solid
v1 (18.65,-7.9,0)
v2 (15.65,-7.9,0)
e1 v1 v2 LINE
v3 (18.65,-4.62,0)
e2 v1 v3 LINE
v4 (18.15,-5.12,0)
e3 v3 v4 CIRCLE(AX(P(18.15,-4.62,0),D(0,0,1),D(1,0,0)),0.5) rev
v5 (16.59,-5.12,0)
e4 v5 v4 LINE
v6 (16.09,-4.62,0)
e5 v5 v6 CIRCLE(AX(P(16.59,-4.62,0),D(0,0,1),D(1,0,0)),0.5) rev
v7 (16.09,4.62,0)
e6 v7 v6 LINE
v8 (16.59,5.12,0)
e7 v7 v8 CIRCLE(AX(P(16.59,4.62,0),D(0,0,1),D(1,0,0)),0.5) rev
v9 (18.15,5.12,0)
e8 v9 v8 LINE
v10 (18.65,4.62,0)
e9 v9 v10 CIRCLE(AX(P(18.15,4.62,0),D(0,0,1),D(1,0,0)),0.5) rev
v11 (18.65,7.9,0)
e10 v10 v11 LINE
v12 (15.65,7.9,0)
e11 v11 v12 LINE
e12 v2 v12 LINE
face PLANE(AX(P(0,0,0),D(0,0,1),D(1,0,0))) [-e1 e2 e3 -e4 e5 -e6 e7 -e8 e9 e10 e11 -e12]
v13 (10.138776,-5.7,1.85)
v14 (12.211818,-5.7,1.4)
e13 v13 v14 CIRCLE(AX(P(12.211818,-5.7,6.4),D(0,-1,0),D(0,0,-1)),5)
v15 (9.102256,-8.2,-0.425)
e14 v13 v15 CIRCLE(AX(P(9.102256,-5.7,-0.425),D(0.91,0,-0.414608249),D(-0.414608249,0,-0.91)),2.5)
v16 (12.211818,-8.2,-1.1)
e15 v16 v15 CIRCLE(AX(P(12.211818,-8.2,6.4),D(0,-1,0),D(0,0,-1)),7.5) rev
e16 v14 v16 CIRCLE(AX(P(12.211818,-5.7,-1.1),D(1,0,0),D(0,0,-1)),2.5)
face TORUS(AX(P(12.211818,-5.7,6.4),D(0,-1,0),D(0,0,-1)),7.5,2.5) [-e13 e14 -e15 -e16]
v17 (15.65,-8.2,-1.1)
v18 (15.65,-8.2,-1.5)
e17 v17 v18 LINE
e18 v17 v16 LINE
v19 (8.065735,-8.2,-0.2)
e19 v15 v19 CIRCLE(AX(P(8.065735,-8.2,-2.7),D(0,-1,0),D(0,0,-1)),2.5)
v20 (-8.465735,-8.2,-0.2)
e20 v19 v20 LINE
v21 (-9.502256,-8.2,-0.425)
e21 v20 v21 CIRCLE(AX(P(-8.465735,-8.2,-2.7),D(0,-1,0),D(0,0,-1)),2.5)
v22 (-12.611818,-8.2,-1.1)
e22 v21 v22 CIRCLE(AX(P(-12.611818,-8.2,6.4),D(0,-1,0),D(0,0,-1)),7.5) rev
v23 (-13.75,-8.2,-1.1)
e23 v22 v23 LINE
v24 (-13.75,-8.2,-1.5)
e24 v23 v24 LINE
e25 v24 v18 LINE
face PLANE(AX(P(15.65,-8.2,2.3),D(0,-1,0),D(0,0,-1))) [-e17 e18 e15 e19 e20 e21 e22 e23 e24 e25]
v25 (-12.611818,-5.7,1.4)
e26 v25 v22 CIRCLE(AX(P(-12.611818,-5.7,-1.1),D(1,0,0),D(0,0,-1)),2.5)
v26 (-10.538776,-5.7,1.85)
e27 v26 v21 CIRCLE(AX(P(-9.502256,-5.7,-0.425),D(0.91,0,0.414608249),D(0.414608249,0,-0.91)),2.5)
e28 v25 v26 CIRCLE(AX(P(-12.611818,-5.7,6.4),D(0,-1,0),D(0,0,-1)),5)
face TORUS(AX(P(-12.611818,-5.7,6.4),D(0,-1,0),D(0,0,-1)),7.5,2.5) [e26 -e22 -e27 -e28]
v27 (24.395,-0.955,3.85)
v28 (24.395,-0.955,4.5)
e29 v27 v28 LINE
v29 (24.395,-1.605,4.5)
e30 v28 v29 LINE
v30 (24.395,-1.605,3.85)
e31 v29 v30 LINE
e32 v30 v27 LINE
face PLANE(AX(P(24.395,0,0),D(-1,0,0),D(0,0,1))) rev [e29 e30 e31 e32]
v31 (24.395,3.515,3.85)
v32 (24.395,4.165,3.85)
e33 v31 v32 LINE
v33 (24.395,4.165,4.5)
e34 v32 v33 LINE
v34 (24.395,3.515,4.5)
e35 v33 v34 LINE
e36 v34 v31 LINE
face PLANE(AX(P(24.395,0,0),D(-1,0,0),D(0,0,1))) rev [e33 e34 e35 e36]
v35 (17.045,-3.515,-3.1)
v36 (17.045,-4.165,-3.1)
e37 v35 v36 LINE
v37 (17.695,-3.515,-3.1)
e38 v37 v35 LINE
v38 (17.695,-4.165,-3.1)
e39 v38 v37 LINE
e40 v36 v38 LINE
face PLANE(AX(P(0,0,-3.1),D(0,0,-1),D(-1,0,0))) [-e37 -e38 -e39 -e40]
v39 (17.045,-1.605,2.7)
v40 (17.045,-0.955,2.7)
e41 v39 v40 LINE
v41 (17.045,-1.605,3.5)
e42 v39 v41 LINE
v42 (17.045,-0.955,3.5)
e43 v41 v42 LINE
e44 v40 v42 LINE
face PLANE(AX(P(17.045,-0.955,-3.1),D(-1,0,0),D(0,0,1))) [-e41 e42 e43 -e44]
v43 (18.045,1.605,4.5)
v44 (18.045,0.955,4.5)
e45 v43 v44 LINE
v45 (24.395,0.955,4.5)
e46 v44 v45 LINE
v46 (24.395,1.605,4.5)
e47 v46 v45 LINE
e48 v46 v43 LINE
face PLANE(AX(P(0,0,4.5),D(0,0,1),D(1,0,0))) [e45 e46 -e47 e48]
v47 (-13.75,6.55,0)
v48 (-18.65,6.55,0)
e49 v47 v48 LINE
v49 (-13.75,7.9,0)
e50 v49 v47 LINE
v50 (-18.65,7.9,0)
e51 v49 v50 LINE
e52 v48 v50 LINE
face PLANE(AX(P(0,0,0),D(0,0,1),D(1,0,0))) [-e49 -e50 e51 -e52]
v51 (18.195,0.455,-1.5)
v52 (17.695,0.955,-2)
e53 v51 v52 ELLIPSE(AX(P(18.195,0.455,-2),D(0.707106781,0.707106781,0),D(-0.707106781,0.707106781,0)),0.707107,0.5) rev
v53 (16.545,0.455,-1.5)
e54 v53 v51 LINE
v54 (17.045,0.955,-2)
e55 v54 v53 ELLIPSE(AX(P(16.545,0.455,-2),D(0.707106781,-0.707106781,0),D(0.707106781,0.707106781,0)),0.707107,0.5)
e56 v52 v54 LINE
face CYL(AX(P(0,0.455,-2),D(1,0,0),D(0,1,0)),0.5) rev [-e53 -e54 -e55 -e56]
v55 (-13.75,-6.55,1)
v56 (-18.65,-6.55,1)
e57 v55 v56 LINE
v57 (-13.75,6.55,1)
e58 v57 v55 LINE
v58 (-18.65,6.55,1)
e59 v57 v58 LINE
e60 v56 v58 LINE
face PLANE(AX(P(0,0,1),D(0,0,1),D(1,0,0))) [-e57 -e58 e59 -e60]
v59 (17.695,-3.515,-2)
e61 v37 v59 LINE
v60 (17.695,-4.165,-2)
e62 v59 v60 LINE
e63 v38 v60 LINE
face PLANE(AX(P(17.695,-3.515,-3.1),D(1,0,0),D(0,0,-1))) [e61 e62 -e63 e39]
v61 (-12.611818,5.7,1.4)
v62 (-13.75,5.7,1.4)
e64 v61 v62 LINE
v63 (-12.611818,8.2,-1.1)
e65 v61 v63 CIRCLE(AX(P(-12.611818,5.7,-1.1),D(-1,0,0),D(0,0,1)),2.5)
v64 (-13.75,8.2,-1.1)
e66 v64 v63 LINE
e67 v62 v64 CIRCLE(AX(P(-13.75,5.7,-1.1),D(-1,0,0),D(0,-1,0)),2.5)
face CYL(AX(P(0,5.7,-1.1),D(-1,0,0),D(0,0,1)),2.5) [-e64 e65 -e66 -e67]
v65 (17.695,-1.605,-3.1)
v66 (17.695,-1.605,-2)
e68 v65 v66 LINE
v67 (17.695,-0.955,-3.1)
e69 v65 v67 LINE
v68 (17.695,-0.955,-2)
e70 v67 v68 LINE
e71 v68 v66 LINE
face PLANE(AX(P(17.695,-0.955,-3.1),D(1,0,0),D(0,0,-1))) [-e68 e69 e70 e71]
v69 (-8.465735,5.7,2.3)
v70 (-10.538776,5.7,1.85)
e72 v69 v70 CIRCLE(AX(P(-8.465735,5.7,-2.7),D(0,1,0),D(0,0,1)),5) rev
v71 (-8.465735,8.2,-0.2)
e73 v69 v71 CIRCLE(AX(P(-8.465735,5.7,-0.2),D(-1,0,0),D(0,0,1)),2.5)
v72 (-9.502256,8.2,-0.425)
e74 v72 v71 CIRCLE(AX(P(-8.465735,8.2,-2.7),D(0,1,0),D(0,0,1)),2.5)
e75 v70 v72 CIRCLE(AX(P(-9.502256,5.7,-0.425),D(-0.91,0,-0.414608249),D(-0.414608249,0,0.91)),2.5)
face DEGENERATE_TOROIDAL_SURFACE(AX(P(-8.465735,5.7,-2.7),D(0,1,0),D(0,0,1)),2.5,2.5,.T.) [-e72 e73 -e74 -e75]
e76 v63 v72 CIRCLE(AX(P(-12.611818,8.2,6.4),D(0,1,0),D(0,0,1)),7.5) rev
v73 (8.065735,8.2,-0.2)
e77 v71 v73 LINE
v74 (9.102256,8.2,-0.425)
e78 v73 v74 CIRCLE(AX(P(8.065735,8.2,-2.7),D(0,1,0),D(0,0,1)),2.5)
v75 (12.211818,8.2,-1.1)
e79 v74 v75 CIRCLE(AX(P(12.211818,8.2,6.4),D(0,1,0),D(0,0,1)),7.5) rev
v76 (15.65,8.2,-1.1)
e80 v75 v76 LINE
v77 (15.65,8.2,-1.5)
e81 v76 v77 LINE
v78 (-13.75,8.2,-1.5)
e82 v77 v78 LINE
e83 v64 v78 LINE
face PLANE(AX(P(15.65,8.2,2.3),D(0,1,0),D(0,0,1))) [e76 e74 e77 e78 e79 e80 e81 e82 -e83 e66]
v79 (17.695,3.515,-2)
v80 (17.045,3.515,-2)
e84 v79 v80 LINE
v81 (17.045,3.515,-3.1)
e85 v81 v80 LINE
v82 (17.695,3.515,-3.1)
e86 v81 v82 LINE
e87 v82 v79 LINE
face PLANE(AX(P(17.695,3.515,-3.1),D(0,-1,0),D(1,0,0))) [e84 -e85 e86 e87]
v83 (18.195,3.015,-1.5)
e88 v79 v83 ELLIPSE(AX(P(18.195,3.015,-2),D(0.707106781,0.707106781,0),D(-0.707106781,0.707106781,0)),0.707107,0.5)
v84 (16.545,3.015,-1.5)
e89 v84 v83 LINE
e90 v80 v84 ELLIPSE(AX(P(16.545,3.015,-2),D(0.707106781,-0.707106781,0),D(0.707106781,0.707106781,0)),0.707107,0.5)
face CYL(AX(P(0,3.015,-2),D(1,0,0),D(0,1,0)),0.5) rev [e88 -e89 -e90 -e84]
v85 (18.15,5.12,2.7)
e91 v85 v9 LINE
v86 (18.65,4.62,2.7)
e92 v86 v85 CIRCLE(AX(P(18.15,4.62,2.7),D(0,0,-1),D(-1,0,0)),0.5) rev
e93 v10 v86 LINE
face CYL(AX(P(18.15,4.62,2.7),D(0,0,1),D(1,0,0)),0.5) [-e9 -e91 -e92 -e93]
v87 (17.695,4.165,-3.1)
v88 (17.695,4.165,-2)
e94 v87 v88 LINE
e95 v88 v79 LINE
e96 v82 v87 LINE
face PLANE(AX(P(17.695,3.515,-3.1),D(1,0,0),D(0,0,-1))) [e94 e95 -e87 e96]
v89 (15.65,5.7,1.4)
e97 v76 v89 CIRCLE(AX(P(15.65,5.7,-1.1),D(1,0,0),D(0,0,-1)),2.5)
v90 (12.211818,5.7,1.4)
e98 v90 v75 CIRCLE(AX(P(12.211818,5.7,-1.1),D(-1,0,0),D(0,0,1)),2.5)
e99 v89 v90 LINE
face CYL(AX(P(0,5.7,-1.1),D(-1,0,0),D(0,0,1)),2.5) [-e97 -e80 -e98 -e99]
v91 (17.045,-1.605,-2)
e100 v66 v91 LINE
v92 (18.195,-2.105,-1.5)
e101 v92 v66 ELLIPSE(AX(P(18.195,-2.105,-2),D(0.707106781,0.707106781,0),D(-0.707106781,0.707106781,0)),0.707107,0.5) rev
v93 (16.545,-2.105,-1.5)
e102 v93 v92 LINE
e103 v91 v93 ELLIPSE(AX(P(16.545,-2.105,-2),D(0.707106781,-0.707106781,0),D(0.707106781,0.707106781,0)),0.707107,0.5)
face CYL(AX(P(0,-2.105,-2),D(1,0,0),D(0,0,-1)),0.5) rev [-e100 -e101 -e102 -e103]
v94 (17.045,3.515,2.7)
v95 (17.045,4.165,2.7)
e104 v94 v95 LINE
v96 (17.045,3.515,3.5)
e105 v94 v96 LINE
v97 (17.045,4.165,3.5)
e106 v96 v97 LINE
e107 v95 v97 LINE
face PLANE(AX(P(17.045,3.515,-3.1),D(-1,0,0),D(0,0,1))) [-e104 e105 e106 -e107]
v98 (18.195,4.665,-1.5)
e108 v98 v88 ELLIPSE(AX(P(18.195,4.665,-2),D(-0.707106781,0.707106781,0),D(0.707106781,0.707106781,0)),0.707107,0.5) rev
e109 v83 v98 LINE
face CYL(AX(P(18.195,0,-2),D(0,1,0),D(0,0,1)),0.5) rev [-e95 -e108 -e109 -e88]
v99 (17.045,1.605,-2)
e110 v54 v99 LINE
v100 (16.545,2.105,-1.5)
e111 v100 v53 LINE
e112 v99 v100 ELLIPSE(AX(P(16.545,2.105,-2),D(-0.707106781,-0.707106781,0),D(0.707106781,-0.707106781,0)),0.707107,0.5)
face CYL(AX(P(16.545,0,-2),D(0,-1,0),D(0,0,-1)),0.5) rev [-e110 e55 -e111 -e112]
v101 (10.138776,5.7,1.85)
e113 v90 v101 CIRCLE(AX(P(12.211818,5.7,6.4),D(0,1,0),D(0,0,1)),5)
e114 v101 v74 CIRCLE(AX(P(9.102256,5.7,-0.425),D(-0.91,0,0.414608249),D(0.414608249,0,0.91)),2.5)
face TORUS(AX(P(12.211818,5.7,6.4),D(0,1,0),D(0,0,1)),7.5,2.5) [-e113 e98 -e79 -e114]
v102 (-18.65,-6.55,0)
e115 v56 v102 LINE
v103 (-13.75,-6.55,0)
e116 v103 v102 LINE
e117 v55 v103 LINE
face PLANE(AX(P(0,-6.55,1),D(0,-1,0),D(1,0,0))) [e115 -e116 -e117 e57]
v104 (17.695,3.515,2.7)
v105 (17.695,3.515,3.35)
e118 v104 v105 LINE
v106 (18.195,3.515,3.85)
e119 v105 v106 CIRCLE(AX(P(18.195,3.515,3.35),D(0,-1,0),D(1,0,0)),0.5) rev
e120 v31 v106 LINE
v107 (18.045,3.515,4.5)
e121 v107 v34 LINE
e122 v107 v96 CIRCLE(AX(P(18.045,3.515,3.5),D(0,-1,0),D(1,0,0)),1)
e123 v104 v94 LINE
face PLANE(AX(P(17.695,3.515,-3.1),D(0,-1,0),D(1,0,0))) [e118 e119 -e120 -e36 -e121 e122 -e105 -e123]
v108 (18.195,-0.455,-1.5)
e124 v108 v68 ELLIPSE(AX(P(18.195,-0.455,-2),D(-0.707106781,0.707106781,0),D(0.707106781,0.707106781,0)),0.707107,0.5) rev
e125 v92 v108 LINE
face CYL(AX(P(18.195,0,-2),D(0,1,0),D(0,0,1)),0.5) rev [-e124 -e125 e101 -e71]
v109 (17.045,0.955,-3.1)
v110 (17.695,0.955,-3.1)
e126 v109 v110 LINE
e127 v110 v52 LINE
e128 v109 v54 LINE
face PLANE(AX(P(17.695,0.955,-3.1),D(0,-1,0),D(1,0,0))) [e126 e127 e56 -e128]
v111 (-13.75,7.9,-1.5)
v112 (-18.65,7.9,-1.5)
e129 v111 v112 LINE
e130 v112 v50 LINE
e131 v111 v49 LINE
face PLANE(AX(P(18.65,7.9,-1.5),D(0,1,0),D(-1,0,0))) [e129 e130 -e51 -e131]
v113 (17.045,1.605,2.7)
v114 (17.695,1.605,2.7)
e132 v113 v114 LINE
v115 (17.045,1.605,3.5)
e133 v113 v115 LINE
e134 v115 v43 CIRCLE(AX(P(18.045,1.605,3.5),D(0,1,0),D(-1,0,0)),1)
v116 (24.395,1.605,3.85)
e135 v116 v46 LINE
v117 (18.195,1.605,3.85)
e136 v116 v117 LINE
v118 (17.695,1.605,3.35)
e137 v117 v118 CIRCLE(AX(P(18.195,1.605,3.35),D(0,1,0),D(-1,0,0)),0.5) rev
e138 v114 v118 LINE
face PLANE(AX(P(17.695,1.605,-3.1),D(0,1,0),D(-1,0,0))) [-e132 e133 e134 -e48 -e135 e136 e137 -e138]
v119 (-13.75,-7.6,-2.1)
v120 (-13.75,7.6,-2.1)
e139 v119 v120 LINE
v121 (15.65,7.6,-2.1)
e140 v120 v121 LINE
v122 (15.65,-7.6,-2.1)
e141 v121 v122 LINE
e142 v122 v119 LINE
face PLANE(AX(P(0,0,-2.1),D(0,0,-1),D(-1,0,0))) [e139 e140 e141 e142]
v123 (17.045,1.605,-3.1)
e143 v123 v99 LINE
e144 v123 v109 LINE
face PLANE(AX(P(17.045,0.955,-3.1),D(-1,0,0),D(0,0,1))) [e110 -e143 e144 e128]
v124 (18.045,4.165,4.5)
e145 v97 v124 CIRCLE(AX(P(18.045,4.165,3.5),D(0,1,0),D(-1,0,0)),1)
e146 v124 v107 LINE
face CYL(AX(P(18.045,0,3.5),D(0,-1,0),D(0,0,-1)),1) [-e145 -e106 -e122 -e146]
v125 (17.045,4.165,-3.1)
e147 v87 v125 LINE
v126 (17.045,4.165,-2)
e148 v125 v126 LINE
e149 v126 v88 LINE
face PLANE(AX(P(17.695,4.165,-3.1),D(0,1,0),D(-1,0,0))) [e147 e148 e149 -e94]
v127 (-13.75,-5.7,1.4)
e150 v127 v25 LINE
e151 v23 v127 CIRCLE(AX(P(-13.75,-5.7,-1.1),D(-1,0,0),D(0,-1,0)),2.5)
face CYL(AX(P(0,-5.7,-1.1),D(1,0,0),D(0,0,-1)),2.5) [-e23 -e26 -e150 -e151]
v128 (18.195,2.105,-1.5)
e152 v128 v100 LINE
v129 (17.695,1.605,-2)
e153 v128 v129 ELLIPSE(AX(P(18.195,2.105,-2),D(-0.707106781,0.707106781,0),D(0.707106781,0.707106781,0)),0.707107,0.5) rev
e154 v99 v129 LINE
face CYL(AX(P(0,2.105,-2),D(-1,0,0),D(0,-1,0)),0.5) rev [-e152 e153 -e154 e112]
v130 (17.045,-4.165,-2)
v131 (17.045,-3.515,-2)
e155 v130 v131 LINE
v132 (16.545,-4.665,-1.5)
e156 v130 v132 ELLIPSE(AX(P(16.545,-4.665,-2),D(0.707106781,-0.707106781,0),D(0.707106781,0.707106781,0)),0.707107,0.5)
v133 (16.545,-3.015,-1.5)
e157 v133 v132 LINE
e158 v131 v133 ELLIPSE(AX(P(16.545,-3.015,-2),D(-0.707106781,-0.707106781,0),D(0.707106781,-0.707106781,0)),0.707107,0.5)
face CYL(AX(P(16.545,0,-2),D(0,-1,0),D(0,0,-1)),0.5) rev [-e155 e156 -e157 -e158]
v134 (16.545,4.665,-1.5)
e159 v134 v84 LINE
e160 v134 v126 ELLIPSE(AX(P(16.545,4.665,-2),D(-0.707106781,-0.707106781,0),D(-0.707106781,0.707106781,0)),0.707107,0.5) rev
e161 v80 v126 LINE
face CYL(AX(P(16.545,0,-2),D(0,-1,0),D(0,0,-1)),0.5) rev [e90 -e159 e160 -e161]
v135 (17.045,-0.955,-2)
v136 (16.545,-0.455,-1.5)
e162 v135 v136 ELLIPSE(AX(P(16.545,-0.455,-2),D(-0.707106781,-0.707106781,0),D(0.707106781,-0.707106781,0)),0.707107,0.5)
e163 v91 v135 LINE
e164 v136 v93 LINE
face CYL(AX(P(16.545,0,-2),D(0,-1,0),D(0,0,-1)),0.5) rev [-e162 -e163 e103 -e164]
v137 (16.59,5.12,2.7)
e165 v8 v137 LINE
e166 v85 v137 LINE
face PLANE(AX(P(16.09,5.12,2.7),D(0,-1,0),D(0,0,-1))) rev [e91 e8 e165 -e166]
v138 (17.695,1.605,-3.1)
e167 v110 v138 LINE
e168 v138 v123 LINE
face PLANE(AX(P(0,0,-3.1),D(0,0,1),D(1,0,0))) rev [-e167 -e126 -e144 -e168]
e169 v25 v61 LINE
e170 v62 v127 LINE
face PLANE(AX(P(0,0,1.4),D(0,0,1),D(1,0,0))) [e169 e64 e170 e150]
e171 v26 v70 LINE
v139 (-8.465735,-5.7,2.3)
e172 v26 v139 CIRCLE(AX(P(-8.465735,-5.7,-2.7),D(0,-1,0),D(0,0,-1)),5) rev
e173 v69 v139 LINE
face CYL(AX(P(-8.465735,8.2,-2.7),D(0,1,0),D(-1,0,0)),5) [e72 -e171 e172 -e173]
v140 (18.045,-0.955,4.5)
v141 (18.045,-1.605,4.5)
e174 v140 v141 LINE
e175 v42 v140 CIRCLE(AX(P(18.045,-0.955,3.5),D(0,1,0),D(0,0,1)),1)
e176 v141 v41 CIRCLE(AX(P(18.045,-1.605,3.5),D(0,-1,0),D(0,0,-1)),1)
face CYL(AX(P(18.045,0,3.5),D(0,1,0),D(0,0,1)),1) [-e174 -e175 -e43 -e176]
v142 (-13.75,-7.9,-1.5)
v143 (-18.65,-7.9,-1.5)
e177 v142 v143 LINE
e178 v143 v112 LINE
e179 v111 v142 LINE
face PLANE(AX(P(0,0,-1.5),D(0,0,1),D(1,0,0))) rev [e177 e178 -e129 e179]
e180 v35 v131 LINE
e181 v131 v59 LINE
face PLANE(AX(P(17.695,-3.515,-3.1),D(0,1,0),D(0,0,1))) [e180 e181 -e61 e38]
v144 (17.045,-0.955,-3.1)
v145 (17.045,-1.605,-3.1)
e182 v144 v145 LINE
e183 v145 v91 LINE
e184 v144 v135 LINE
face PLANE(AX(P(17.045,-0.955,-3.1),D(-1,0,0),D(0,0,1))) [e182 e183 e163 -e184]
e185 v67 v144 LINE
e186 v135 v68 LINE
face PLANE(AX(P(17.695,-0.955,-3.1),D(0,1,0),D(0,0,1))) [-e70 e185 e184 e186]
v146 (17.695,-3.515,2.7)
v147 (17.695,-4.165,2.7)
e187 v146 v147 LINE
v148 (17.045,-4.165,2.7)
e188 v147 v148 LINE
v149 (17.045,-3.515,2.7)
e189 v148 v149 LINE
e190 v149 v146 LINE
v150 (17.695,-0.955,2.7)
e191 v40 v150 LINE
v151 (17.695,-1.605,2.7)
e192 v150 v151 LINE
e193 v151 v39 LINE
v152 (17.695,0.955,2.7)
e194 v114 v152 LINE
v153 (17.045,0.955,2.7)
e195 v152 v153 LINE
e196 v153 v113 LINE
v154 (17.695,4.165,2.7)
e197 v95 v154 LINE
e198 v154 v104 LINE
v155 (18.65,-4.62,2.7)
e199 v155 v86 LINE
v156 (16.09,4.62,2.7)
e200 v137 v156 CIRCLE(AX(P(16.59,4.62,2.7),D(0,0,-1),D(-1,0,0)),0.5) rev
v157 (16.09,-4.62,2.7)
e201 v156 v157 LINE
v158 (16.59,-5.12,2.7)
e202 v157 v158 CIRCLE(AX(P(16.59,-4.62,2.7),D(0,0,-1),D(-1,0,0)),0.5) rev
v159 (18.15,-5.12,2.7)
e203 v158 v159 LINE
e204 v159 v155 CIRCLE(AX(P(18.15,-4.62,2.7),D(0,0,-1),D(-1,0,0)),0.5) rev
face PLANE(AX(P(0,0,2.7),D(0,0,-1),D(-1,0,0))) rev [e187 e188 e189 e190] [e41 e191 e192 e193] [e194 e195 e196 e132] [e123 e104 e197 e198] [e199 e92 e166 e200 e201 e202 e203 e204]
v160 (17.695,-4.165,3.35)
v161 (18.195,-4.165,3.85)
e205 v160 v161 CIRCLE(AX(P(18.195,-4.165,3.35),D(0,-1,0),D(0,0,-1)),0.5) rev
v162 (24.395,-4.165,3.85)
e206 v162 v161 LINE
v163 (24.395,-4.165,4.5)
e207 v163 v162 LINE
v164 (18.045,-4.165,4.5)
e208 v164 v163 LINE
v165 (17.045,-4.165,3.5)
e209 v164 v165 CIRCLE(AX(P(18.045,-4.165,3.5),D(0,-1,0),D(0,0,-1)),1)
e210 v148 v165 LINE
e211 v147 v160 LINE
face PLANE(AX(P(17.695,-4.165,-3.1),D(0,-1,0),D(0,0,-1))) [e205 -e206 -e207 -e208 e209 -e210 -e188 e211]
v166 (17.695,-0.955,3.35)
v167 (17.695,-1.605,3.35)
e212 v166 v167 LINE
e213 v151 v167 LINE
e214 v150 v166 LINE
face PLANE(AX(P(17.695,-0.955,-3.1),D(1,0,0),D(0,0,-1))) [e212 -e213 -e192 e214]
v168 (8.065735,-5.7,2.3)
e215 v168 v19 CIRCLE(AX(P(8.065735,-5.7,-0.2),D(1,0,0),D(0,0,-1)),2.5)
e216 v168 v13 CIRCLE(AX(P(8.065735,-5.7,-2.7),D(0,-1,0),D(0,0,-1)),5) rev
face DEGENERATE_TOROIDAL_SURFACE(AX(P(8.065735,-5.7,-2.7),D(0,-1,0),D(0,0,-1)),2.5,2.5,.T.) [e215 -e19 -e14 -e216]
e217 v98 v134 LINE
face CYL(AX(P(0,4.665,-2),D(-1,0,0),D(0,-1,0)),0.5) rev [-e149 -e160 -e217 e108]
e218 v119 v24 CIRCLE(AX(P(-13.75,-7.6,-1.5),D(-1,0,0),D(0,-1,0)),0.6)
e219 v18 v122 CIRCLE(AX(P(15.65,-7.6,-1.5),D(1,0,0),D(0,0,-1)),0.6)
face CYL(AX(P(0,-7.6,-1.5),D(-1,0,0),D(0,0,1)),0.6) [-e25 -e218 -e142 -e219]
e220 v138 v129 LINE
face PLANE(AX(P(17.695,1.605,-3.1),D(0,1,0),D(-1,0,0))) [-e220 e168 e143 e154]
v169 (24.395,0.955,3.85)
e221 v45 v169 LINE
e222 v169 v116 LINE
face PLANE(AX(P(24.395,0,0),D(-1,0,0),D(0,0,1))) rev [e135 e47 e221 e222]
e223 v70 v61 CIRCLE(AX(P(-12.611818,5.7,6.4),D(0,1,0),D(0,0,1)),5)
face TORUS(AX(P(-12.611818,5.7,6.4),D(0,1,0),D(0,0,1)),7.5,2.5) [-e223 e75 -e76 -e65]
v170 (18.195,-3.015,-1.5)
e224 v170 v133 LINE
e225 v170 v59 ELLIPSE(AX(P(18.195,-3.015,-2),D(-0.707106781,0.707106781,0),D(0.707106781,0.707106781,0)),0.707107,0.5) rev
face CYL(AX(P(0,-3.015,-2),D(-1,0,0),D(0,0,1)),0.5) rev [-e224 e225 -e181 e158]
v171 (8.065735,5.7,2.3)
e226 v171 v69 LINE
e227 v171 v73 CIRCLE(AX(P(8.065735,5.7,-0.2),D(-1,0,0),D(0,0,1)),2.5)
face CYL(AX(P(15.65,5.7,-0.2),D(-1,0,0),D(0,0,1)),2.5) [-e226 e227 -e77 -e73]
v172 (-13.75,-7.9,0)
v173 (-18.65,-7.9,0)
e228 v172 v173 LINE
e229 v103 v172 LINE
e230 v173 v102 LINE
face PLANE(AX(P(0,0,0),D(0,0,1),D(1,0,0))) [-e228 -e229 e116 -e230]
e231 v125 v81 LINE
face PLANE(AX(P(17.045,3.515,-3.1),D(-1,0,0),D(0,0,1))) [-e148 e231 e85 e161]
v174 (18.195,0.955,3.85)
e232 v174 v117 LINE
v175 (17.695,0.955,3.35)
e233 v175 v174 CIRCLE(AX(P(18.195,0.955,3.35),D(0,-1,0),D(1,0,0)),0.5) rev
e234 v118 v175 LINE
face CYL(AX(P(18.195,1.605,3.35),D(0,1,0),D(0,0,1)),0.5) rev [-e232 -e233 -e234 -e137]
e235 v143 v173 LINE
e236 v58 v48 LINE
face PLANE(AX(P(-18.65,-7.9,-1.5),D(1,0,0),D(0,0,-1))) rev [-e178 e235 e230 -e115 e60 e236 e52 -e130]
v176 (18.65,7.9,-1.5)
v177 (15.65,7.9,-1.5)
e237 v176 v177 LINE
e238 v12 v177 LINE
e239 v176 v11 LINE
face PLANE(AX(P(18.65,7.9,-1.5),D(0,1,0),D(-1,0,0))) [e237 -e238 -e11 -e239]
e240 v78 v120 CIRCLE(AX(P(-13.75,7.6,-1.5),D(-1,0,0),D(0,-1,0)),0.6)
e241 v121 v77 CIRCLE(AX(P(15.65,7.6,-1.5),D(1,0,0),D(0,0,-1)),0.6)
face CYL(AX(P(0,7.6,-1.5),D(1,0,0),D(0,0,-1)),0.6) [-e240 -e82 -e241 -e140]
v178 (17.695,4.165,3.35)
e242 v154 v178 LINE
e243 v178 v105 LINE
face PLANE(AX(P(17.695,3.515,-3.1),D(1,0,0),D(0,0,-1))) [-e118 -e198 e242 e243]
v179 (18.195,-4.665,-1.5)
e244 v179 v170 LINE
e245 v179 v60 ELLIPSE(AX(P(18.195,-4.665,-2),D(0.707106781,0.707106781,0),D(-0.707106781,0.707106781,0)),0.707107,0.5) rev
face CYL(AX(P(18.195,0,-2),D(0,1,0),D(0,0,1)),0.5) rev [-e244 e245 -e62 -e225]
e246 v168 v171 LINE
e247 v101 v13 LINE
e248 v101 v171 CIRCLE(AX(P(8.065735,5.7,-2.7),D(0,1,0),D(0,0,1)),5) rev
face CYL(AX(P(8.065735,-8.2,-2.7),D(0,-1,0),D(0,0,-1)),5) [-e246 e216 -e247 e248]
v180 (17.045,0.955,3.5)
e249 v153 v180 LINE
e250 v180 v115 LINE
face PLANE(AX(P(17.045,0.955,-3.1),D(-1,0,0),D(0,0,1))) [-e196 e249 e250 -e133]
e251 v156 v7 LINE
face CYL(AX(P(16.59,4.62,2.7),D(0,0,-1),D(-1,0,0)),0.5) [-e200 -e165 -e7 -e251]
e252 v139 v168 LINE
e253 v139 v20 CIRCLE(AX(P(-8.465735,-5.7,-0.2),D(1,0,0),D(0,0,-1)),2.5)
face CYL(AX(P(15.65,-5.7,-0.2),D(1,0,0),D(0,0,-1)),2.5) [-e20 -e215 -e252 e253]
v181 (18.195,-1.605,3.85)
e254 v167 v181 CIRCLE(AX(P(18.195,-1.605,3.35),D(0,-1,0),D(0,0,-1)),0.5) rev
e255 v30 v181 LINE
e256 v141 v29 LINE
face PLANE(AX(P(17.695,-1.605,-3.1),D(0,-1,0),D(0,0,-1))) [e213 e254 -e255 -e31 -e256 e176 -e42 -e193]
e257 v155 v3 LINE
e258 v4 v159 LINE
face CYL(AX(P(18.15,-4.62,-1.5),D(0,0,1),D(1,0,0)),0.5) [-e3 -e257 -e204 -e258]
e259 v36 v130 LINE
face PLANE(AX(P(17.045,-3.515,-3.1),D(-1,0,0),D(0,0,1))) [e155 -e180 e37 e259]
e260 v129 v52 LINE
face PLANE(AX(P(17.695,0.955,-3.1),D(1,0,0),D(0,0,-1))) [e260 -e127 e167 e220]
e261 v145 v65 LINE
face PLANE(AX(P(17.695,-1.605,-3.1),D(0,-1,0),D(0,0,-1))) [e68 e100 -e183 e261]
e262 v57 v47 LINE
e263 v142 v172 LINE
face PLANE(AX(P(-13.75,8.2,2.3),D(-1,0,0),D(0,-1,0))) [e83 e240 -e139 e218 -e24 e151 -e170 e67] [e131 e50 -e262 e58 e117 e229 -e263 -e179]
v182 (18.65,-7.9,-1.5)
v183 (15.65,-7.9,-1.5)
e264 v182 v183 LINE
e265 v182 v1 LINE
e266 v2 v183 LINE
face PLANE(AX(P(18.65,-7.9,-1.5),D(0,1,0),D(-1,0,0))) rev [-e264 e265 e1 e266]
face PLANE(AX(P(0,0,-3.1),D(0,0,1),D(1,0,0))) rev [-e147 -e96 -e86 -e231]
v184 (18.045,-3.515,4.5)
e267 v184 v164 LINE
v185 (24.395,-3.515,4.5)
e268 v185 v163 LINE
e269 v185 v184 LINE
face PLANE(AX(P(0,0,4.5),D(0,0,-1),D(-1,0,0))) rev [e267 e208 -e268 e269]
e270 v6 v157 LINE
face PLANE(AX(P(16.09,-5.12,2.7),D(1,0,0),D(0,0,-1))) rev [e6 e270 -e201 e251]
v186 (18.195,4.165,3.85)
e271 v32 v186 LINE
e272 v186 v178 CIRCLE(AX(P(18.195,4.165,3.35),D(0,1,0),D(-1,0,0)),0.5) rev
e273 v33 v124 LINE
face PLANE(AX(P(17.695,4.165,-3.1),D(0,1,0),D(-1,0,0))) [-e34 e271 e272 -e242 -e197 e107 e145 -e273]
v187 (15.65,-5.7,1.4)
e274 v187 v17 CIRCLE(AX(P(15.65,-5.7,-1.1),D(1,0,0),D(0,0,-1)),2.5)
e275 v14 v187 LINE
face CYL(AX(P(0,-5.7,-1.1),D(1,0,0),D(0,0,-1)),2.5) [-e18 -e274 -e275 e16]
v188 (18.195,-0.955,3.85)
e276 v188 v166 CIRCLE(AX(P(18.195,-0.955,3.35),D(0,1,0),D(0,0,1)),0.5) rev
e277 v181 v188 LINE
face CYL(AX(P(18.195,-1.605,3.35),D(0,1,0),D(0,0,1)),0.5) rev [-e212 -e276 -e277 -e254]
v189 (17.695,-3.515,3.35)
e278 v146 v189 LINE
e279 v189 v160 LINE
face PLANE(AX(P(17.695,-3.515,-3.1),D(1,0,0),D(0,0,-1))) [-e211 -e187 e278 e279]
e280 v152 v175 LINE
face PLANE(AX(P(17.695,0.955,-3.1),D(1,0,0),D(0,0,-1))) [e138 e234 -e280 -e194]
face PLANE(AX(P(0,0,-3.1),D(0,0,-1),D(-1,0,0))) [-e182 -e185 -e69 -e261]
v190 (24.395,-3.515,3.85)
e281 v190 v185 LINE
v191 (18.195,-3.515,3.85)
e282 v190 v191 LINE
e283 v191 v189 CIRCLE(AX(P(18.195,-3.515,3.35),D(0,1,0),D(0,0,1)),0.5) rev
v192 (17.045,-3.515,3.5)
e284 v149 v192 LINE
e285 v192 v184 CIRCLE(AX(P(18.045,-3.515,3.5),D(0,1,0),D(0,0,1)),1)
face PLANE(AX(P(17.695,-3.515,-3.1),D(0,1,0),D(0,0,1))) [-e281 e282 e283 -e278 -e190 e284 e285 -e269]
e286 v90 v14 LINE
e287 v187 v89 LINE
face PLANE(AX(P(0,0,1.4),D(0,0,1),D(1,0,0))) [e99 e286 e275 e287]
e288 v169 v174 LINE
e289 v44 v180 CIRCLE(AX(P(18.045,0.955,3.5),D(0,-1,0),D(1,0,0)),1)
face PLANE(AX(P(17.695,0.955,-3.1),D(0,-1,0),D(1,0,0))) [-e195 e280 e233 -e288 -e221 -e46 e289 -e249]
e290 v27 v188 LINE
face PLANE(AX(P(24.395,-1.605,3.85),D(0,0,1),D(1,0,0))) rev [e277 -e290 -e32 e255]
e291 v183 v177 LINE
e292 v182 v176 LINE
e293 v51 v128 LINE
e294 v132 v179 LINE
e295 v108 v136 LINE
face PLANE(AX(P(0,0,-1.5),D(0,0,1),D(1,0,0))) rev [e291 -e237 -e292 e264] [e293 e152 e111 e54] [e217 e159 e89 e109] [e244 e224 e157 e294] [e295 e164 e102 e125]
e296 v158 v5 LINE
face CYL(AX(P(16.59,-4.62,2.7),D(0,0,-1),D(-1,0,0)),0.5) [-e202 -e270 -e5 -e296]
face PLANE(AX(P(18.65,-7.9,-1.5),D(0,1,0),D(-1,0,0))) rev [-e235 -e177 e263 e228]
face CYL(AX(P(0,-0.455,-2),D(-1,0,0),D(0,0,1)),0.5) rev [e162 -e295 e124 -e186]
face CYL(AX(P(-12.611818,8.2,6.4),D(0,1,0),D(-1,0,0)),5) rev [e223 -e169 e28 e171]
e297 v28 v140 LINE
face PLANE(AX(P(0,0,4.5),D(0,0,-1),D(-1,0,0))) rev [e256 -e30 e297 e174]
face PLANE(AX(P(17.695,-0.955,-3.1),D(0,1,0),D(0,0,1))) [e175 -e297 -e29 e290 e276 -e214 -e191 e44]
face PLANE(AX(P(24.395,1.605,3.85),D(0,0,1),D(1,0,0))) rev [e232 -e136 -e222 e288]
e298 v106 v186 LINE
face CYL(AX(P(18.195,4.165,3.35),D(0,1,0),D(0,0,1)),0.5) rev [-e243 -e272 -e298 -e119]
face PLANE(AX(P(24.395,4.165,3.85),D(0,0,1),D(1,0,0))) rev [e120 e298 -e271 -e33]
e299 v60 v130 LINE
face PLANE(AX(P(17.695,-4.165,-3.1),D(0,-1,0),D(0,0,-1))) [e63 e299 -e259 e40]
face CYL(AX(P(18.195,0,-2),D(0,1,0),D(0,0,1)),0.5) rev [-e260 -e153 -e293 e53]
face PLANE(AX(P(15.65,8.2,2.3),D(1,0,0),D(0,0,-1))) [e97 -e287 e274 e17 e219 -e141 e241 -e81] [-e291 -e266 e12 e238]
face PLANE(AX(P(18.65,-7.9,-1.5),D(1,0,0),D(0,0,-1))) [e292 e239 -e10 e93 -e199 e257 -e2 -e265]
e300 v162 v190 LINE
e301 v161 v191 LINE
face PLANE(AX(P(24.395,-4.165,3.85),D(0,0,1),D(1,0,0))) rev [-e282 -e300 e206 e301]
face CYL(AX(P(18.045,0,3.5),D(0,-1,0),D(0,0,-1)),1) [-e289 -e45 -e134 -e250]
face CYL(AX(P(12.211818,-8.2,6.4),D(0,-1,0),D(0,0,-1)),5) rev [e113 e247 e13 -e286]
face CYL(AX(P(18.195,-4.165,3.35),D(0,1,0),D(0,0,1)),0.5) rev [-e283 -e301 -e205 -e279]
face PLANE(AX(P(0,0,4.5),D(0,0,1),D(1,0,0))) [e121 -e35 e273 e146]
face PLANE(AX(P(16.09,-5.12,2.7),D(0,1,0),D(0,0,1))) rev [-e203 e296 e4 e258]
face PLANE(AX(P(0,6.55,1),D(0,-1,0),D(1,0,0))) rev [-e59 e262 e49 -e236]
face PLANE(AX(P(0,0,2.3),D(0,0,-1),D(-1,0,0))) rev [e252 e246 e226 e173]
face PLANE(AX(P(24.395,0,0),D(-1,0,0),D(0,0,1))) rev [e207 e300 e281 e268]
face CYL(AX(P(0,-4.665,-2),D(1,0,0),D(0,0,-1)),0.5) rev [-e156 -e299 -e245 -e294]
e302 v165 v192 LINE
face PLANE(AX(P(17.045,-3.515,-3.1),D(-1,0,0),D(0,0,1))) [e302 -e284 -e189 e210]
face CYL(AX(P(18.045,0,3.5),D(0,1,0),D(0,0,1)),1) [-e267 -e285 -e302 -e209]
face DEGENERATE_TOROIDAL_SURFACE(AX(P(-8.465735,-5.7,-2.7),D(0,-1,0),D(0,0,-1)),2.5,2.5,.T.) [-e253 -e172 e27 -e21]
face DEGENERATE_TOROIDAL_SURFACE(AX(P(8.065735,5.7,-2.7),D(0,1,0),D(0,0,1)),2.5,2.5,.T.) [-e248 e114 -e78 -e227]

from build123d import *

# Parameters (mm, degrees)
SKICA1_W                     = 37.3
SKICA1_H                     = 15.8
P_IDAT_VYSUNUT_M1_DEPTH      = 1.5
SKICA1_3_W                   = 27.2
SKICA1_3_H                   = 13.1
P_IDAT_VYSUNUT_M2_DEPTH      = 1
SKICA2_W                     = 2.56
SKICA2_H                     = 10.24
P_IDAT_VYSUNUT_M3_DEPTH      = 2.7
P_IDAT_VYSUNUT_M4_DEPTH      = 1.8
P_IDAT_VYSUNUT_M4_DEPTH_BACK = 5.8
SKICA3_W                     = 0.65
SKICA3_H                     = 0.65
SKICA4_W                     = 0.65
SKICA4_H                     = 0.65
P_IDAT_VYSUNUT_M5_DEPTH      = 6.7
ZAOBLIT1_R                   = 1
ZAOBLIT2_R                   = 0.5
P_IDAT_VYSUNUT_M6_DEPTH      = 0.6
P_IDAT_VYSUNUT_M6_DEPTH_BACK = 3.8
SKICA5_W                     = 29.4
SKICA5_H                     = 16.4
SKICA6_W                     = 6.3
SKICA6_H                     = 16.4
ODEBRAT_VYSUNUT_M1_DEPTH     = 0.9
ZAOBLIT3_R                   = 5
ZAOBLIT4_R                   = 5
SKICA7_W                     = 4
SKICA7_H                     = 16.4
ODEBRAT_VYSUNUT_M2_DEPTH     = 0.9
ZAOBLIT7_R                   = 5
ZAOBLIT8_R                   = 5
ZAOBLIT5_R                   = 2.5
ZAOBLIT6_R                   = 0.6
ZAOBLIT9_R                   = 0.5
ZAOBLIT10_R                  = 0.5


with BuildPart() as part:
    # Skica1 → Přidat vysunutím1 (new body)
    with BuildSketch(Plane.XY):
        Rectangle(SKICA1_W, SKICA1_H)
    extrude(amount=-P_IDAT_VYSUNUT_M1_DEPTH)

    # Skica1<3> → Přidat vysunutím2 (add)
    with BuildSketch(Plane.XY):
        with Locations((-5.05, 0)):
            Rectangle(SKICA1_3_W, SKICA1_3_H)
    extrude(amount=P_IDAT_VYSUNUT_M2_DEPTH)

    # Skica2 → Přidat vysunutím3 (add)
    with BuildSketch(Plane.XY):
        with Locations((17.37, 0)):
            Rectangle(SKICA2_W, SKICA2_H)
    extrude(amount=P_IDAT_VYSUNUT_M3_DEPTH)

    # Skica3 → Přidat vysunutím4 (add, two sides: drawn at the far end of the back side and taken through both)
    with BuildSketch(Plane.XY.offset(2.7).offset(-P_IDAT_VYSUNUT_M4_DEPTH_BACK)):
        with Locations((17.37, -3.84)):
            Rectangle(SKICA3_W, SKICA3_H)
        with Locations((17.37, -1.28)):
            Rectangle(SKICA3_W, SKICA3_H)
        with Locations((17.37, 1.28)):
            Rectangle(SKICA3_W, SKICA3_H)
        with Locations((17.37, 3.84)):
            Rectangle(SKICA3_W, SKICA3_H)
    extrude(amount=P_IDAT_VYSUNUT_M4_DEPTH + P_IDAT_VYSUNUT_M4_DEPTH_BACK)

    # Skica4 → Přidat vysunutím5 (add)
    with BuildSketch(Plane(origin=(17.695, 0, 0), x_dir=(0, 0, -1), z_dir=(1, 0, 0))):
        with Locations((-4.175, -3.84)):
            Rectangle(SKICA4_W, SKICA4_H)
        with Locations((-4.175, -1.28)):
            Rectangle(SKICA4_W, SKICA4_H)
        with Locations((-4.175, 1.28)):
            Rectangle(SKICA4_W, SKICA4_H)
        with Locations((-4.175, 3.84)):
            Rectangle(SKICA4_W, SKICA4_H)
    extrude(amount=P_IDAT_VYSUNUT_M5_DEPTH)

    # Zaoblit1
    zaoblit1_edges = [part.edges().sort_by_distance(p)[0] for p in [
        (17.045, 3.84, 4.5),
        (17.045, -3.84, 4.5),
        (17.045, -1.28, 4.5),
        (17.045, 1.28, 4.5),
    ]]
    fillet(zaoblit1_edges, radius=ZAOBLIT1_R)

    # Zaoblit2
    zaoblit2_edges = [part.edges().sort_by_distance(p)[0] for p in [
        (17.695, -3.84, 3.85),
        (17.695, -1.28, 3.85),
        (17.695, 1.28, 3.85),
        (17.695, 3.84, 3.85),
    ]]
    fillet(zaoblit2_edges, radius=ZAOBLIT2_R)

    # Skica5 → Přidat vysunutím6 (add, two sides: drawn at the far end of the back side and taken through both)
    with BuildSketch(Plane(origin=(0, 0, -1.5), x_dir=(-1, 0, 0), z_dir=(0, 0, -1)).offset(-P_IDAT_VYSUNUT_M6_DEPTH_BACK)):
        with Locations((-0.95, 0)):
            Rectangle(SKICA5_W, SKICA5_H)
    extrude(amount=P_IDAT_VYSUNUT_M6_DEPTH + P_IDAT_VYSUNUT_M6_DEPTH_BACK)

    # Skica6 → Odebrat vysunutím1 (cut)
    with BuildSketch(Plane.XY.offset(2.3)):
        with Locations((12.5, 0)):
            Rectangle(SKICA6_W, SKICA6_H)
    extrude(amount=-ODEBRAT_VYSUNUT_M1_DEPTH, mode=Mode.SUBTRACT)

    # Zaoblit3
    # the kernel refuses this fillet: 5 mm, written as the material it adds along each edge
    with BuildSketch(Plane(origin=(9.35, -8.2, 1.4), x_dir=(1, 0, 0), z_dir=(0, 1, 0))) as zaoblit3_piece_1:
        with BuildLine():
            CenterArc((2.861817604, -5), ZAOBLIT3_R, 90, 34.915206247)
            Line((0, -0.9), (-0.057236352, -0.818))
            ThreePointArc((-0.057236352, -0.818), (-0.1, -0.45), (-0.1, 0))
            Line((-0.1, 0), (0, 0.1))
            Line((0, 0.1), (2.861817604, 0.1))
            Line((2.861817604, 0.1), (2.861817604, 0))
        make_face()
    extrude(amount=16.4)

    # Zaoblit4
    zaoblit4_edges = [part.edges().sort_by_distance(p)[0] for p in [
        (9.35, 0, 2.3),
    ]]
    fillet(zaoblit4_edges, radius=ZAOBLIT4_R)

    # Skica7 → Odebrat vysunutím2 (cut)
    with BuildSketch(Plane.XY.offset(2.3)):
        with Locations((-11.75, 0)):
            Rectangle(SKICA7_W, SKICA7_H)
    extrude(amount=-ODEBRAT_VYSUNUT_M2_DEPTH, mode=Mode.SUBTRACT)

    # Zaoblit7
    # the kernel refuses this fillet: 5 mm, written as the material it adds along each edge
    with BuildSketch(Plane(origin=(-9.75, 8.2, 1.4), x_dir=(-1, 0, 0), z_dir=(0, -1, 0))) as zaoblit7_piece_1:
        with BuildLine():
            CenterArc((2.861817604, -5), ZAOBLIT7_R, 90, 34.915206247)
            Line((0, -0.9), (0, 0))
            Line((0, 0), (2.861817604, 0))
        make_face()
    extrude(amount=16.4)

    # Zaoblit8
    zaoblit8_edges = [part.edges().sort_by_distance(p)[0] for p in [
        (-9.75, 0, 2.3),
    ]]
    fillet(zaoblit8_edges, radius=ZAOBLIT8_R)

    # Zaoblit5
    zaoblit5_edges = [part.edges().sort_by_distance(p)[0] for p in [
        (13.930908802, 8.2, 1.4),
        (13.930908802, -8.2, 1.4),
        (11.151157432, -8.2, 1.513794929),
        (11.151157432, 8.2, 1.513794929),
        (-0.2, -8.2, 2.3),
        (9.126395288, -8.2, 2.186205071),
        (9.126395288, 8.2, 2.186205071),
        (-13.180908802, -8.2, 1.4),
        (-13.180908802, 8.2, 1.4),
        (-11.551157432, 8.2, 1.513794929),
        (-11.551157432, -8.2, 1.513794929),
        (-0.2, 8.2, 2.3),
        (-9.526395288, 8.2, 2.186205071),
        (-9.526395288, -8.2, 2.186205071),
    ]]
    fillet(zaoblit5_edges, radius=ZAOBLIT5_R)

    # Zaoblit6
    zaoblit6_edges = [part.edges().sort_by_distance(p)[0] for p in [
        (0.95, 8.2, -2.1),
        (0.95, -8.2, -2.1),
    ]]
    fillet(zaoblit6_edges, radius=ZAOBLIT6_R)

    # Zaoblit9
    zaoblit9_edges = [part.edges().sort_by_distance(p)[0] for p in [
        (18.65, -5.12, 1.35),
        (18.65, 5.12, 1.35),
        (16.09, 5.12, 1.35),
        (16.09, -5.12, 1.35),
    ]]
    fillet(zaoblit9_edges, radius=ZAOBLIT9_R)

    # Zaoblit10
    zaoblit10_edges = [part.edges().sort_by_distance(p)[0] for p in [
        (17.695, 3.84, -1.5),
        (17.37, 3.515, -1.5),
        (17.045, 3.84, -1.5),
        (17.37, 4.165, -1.5),
        (17.045, -3.84, -1.5),
        (17.37, -3.515, -1.5),
        (17.695, -3.84, -1.5),
        (17.37, -4.165, -1.5),
        (17.045, -1.28, -1.5),
        (17.37, -0.955, -1.5),
        (17.695, -1.28, -1.5),
        (17.37, -1.605, -1.5),
        (17.695, 1.28, -1.5),
        (17.37, 0.955, -1.5),
        (17.045, 1.28, -1.5),
        (17.37, 1.605, -1.5),
    ]]
    fillet(zaoblit10_edges, radius=ZAOBLIT10_R)


solid = part.part
